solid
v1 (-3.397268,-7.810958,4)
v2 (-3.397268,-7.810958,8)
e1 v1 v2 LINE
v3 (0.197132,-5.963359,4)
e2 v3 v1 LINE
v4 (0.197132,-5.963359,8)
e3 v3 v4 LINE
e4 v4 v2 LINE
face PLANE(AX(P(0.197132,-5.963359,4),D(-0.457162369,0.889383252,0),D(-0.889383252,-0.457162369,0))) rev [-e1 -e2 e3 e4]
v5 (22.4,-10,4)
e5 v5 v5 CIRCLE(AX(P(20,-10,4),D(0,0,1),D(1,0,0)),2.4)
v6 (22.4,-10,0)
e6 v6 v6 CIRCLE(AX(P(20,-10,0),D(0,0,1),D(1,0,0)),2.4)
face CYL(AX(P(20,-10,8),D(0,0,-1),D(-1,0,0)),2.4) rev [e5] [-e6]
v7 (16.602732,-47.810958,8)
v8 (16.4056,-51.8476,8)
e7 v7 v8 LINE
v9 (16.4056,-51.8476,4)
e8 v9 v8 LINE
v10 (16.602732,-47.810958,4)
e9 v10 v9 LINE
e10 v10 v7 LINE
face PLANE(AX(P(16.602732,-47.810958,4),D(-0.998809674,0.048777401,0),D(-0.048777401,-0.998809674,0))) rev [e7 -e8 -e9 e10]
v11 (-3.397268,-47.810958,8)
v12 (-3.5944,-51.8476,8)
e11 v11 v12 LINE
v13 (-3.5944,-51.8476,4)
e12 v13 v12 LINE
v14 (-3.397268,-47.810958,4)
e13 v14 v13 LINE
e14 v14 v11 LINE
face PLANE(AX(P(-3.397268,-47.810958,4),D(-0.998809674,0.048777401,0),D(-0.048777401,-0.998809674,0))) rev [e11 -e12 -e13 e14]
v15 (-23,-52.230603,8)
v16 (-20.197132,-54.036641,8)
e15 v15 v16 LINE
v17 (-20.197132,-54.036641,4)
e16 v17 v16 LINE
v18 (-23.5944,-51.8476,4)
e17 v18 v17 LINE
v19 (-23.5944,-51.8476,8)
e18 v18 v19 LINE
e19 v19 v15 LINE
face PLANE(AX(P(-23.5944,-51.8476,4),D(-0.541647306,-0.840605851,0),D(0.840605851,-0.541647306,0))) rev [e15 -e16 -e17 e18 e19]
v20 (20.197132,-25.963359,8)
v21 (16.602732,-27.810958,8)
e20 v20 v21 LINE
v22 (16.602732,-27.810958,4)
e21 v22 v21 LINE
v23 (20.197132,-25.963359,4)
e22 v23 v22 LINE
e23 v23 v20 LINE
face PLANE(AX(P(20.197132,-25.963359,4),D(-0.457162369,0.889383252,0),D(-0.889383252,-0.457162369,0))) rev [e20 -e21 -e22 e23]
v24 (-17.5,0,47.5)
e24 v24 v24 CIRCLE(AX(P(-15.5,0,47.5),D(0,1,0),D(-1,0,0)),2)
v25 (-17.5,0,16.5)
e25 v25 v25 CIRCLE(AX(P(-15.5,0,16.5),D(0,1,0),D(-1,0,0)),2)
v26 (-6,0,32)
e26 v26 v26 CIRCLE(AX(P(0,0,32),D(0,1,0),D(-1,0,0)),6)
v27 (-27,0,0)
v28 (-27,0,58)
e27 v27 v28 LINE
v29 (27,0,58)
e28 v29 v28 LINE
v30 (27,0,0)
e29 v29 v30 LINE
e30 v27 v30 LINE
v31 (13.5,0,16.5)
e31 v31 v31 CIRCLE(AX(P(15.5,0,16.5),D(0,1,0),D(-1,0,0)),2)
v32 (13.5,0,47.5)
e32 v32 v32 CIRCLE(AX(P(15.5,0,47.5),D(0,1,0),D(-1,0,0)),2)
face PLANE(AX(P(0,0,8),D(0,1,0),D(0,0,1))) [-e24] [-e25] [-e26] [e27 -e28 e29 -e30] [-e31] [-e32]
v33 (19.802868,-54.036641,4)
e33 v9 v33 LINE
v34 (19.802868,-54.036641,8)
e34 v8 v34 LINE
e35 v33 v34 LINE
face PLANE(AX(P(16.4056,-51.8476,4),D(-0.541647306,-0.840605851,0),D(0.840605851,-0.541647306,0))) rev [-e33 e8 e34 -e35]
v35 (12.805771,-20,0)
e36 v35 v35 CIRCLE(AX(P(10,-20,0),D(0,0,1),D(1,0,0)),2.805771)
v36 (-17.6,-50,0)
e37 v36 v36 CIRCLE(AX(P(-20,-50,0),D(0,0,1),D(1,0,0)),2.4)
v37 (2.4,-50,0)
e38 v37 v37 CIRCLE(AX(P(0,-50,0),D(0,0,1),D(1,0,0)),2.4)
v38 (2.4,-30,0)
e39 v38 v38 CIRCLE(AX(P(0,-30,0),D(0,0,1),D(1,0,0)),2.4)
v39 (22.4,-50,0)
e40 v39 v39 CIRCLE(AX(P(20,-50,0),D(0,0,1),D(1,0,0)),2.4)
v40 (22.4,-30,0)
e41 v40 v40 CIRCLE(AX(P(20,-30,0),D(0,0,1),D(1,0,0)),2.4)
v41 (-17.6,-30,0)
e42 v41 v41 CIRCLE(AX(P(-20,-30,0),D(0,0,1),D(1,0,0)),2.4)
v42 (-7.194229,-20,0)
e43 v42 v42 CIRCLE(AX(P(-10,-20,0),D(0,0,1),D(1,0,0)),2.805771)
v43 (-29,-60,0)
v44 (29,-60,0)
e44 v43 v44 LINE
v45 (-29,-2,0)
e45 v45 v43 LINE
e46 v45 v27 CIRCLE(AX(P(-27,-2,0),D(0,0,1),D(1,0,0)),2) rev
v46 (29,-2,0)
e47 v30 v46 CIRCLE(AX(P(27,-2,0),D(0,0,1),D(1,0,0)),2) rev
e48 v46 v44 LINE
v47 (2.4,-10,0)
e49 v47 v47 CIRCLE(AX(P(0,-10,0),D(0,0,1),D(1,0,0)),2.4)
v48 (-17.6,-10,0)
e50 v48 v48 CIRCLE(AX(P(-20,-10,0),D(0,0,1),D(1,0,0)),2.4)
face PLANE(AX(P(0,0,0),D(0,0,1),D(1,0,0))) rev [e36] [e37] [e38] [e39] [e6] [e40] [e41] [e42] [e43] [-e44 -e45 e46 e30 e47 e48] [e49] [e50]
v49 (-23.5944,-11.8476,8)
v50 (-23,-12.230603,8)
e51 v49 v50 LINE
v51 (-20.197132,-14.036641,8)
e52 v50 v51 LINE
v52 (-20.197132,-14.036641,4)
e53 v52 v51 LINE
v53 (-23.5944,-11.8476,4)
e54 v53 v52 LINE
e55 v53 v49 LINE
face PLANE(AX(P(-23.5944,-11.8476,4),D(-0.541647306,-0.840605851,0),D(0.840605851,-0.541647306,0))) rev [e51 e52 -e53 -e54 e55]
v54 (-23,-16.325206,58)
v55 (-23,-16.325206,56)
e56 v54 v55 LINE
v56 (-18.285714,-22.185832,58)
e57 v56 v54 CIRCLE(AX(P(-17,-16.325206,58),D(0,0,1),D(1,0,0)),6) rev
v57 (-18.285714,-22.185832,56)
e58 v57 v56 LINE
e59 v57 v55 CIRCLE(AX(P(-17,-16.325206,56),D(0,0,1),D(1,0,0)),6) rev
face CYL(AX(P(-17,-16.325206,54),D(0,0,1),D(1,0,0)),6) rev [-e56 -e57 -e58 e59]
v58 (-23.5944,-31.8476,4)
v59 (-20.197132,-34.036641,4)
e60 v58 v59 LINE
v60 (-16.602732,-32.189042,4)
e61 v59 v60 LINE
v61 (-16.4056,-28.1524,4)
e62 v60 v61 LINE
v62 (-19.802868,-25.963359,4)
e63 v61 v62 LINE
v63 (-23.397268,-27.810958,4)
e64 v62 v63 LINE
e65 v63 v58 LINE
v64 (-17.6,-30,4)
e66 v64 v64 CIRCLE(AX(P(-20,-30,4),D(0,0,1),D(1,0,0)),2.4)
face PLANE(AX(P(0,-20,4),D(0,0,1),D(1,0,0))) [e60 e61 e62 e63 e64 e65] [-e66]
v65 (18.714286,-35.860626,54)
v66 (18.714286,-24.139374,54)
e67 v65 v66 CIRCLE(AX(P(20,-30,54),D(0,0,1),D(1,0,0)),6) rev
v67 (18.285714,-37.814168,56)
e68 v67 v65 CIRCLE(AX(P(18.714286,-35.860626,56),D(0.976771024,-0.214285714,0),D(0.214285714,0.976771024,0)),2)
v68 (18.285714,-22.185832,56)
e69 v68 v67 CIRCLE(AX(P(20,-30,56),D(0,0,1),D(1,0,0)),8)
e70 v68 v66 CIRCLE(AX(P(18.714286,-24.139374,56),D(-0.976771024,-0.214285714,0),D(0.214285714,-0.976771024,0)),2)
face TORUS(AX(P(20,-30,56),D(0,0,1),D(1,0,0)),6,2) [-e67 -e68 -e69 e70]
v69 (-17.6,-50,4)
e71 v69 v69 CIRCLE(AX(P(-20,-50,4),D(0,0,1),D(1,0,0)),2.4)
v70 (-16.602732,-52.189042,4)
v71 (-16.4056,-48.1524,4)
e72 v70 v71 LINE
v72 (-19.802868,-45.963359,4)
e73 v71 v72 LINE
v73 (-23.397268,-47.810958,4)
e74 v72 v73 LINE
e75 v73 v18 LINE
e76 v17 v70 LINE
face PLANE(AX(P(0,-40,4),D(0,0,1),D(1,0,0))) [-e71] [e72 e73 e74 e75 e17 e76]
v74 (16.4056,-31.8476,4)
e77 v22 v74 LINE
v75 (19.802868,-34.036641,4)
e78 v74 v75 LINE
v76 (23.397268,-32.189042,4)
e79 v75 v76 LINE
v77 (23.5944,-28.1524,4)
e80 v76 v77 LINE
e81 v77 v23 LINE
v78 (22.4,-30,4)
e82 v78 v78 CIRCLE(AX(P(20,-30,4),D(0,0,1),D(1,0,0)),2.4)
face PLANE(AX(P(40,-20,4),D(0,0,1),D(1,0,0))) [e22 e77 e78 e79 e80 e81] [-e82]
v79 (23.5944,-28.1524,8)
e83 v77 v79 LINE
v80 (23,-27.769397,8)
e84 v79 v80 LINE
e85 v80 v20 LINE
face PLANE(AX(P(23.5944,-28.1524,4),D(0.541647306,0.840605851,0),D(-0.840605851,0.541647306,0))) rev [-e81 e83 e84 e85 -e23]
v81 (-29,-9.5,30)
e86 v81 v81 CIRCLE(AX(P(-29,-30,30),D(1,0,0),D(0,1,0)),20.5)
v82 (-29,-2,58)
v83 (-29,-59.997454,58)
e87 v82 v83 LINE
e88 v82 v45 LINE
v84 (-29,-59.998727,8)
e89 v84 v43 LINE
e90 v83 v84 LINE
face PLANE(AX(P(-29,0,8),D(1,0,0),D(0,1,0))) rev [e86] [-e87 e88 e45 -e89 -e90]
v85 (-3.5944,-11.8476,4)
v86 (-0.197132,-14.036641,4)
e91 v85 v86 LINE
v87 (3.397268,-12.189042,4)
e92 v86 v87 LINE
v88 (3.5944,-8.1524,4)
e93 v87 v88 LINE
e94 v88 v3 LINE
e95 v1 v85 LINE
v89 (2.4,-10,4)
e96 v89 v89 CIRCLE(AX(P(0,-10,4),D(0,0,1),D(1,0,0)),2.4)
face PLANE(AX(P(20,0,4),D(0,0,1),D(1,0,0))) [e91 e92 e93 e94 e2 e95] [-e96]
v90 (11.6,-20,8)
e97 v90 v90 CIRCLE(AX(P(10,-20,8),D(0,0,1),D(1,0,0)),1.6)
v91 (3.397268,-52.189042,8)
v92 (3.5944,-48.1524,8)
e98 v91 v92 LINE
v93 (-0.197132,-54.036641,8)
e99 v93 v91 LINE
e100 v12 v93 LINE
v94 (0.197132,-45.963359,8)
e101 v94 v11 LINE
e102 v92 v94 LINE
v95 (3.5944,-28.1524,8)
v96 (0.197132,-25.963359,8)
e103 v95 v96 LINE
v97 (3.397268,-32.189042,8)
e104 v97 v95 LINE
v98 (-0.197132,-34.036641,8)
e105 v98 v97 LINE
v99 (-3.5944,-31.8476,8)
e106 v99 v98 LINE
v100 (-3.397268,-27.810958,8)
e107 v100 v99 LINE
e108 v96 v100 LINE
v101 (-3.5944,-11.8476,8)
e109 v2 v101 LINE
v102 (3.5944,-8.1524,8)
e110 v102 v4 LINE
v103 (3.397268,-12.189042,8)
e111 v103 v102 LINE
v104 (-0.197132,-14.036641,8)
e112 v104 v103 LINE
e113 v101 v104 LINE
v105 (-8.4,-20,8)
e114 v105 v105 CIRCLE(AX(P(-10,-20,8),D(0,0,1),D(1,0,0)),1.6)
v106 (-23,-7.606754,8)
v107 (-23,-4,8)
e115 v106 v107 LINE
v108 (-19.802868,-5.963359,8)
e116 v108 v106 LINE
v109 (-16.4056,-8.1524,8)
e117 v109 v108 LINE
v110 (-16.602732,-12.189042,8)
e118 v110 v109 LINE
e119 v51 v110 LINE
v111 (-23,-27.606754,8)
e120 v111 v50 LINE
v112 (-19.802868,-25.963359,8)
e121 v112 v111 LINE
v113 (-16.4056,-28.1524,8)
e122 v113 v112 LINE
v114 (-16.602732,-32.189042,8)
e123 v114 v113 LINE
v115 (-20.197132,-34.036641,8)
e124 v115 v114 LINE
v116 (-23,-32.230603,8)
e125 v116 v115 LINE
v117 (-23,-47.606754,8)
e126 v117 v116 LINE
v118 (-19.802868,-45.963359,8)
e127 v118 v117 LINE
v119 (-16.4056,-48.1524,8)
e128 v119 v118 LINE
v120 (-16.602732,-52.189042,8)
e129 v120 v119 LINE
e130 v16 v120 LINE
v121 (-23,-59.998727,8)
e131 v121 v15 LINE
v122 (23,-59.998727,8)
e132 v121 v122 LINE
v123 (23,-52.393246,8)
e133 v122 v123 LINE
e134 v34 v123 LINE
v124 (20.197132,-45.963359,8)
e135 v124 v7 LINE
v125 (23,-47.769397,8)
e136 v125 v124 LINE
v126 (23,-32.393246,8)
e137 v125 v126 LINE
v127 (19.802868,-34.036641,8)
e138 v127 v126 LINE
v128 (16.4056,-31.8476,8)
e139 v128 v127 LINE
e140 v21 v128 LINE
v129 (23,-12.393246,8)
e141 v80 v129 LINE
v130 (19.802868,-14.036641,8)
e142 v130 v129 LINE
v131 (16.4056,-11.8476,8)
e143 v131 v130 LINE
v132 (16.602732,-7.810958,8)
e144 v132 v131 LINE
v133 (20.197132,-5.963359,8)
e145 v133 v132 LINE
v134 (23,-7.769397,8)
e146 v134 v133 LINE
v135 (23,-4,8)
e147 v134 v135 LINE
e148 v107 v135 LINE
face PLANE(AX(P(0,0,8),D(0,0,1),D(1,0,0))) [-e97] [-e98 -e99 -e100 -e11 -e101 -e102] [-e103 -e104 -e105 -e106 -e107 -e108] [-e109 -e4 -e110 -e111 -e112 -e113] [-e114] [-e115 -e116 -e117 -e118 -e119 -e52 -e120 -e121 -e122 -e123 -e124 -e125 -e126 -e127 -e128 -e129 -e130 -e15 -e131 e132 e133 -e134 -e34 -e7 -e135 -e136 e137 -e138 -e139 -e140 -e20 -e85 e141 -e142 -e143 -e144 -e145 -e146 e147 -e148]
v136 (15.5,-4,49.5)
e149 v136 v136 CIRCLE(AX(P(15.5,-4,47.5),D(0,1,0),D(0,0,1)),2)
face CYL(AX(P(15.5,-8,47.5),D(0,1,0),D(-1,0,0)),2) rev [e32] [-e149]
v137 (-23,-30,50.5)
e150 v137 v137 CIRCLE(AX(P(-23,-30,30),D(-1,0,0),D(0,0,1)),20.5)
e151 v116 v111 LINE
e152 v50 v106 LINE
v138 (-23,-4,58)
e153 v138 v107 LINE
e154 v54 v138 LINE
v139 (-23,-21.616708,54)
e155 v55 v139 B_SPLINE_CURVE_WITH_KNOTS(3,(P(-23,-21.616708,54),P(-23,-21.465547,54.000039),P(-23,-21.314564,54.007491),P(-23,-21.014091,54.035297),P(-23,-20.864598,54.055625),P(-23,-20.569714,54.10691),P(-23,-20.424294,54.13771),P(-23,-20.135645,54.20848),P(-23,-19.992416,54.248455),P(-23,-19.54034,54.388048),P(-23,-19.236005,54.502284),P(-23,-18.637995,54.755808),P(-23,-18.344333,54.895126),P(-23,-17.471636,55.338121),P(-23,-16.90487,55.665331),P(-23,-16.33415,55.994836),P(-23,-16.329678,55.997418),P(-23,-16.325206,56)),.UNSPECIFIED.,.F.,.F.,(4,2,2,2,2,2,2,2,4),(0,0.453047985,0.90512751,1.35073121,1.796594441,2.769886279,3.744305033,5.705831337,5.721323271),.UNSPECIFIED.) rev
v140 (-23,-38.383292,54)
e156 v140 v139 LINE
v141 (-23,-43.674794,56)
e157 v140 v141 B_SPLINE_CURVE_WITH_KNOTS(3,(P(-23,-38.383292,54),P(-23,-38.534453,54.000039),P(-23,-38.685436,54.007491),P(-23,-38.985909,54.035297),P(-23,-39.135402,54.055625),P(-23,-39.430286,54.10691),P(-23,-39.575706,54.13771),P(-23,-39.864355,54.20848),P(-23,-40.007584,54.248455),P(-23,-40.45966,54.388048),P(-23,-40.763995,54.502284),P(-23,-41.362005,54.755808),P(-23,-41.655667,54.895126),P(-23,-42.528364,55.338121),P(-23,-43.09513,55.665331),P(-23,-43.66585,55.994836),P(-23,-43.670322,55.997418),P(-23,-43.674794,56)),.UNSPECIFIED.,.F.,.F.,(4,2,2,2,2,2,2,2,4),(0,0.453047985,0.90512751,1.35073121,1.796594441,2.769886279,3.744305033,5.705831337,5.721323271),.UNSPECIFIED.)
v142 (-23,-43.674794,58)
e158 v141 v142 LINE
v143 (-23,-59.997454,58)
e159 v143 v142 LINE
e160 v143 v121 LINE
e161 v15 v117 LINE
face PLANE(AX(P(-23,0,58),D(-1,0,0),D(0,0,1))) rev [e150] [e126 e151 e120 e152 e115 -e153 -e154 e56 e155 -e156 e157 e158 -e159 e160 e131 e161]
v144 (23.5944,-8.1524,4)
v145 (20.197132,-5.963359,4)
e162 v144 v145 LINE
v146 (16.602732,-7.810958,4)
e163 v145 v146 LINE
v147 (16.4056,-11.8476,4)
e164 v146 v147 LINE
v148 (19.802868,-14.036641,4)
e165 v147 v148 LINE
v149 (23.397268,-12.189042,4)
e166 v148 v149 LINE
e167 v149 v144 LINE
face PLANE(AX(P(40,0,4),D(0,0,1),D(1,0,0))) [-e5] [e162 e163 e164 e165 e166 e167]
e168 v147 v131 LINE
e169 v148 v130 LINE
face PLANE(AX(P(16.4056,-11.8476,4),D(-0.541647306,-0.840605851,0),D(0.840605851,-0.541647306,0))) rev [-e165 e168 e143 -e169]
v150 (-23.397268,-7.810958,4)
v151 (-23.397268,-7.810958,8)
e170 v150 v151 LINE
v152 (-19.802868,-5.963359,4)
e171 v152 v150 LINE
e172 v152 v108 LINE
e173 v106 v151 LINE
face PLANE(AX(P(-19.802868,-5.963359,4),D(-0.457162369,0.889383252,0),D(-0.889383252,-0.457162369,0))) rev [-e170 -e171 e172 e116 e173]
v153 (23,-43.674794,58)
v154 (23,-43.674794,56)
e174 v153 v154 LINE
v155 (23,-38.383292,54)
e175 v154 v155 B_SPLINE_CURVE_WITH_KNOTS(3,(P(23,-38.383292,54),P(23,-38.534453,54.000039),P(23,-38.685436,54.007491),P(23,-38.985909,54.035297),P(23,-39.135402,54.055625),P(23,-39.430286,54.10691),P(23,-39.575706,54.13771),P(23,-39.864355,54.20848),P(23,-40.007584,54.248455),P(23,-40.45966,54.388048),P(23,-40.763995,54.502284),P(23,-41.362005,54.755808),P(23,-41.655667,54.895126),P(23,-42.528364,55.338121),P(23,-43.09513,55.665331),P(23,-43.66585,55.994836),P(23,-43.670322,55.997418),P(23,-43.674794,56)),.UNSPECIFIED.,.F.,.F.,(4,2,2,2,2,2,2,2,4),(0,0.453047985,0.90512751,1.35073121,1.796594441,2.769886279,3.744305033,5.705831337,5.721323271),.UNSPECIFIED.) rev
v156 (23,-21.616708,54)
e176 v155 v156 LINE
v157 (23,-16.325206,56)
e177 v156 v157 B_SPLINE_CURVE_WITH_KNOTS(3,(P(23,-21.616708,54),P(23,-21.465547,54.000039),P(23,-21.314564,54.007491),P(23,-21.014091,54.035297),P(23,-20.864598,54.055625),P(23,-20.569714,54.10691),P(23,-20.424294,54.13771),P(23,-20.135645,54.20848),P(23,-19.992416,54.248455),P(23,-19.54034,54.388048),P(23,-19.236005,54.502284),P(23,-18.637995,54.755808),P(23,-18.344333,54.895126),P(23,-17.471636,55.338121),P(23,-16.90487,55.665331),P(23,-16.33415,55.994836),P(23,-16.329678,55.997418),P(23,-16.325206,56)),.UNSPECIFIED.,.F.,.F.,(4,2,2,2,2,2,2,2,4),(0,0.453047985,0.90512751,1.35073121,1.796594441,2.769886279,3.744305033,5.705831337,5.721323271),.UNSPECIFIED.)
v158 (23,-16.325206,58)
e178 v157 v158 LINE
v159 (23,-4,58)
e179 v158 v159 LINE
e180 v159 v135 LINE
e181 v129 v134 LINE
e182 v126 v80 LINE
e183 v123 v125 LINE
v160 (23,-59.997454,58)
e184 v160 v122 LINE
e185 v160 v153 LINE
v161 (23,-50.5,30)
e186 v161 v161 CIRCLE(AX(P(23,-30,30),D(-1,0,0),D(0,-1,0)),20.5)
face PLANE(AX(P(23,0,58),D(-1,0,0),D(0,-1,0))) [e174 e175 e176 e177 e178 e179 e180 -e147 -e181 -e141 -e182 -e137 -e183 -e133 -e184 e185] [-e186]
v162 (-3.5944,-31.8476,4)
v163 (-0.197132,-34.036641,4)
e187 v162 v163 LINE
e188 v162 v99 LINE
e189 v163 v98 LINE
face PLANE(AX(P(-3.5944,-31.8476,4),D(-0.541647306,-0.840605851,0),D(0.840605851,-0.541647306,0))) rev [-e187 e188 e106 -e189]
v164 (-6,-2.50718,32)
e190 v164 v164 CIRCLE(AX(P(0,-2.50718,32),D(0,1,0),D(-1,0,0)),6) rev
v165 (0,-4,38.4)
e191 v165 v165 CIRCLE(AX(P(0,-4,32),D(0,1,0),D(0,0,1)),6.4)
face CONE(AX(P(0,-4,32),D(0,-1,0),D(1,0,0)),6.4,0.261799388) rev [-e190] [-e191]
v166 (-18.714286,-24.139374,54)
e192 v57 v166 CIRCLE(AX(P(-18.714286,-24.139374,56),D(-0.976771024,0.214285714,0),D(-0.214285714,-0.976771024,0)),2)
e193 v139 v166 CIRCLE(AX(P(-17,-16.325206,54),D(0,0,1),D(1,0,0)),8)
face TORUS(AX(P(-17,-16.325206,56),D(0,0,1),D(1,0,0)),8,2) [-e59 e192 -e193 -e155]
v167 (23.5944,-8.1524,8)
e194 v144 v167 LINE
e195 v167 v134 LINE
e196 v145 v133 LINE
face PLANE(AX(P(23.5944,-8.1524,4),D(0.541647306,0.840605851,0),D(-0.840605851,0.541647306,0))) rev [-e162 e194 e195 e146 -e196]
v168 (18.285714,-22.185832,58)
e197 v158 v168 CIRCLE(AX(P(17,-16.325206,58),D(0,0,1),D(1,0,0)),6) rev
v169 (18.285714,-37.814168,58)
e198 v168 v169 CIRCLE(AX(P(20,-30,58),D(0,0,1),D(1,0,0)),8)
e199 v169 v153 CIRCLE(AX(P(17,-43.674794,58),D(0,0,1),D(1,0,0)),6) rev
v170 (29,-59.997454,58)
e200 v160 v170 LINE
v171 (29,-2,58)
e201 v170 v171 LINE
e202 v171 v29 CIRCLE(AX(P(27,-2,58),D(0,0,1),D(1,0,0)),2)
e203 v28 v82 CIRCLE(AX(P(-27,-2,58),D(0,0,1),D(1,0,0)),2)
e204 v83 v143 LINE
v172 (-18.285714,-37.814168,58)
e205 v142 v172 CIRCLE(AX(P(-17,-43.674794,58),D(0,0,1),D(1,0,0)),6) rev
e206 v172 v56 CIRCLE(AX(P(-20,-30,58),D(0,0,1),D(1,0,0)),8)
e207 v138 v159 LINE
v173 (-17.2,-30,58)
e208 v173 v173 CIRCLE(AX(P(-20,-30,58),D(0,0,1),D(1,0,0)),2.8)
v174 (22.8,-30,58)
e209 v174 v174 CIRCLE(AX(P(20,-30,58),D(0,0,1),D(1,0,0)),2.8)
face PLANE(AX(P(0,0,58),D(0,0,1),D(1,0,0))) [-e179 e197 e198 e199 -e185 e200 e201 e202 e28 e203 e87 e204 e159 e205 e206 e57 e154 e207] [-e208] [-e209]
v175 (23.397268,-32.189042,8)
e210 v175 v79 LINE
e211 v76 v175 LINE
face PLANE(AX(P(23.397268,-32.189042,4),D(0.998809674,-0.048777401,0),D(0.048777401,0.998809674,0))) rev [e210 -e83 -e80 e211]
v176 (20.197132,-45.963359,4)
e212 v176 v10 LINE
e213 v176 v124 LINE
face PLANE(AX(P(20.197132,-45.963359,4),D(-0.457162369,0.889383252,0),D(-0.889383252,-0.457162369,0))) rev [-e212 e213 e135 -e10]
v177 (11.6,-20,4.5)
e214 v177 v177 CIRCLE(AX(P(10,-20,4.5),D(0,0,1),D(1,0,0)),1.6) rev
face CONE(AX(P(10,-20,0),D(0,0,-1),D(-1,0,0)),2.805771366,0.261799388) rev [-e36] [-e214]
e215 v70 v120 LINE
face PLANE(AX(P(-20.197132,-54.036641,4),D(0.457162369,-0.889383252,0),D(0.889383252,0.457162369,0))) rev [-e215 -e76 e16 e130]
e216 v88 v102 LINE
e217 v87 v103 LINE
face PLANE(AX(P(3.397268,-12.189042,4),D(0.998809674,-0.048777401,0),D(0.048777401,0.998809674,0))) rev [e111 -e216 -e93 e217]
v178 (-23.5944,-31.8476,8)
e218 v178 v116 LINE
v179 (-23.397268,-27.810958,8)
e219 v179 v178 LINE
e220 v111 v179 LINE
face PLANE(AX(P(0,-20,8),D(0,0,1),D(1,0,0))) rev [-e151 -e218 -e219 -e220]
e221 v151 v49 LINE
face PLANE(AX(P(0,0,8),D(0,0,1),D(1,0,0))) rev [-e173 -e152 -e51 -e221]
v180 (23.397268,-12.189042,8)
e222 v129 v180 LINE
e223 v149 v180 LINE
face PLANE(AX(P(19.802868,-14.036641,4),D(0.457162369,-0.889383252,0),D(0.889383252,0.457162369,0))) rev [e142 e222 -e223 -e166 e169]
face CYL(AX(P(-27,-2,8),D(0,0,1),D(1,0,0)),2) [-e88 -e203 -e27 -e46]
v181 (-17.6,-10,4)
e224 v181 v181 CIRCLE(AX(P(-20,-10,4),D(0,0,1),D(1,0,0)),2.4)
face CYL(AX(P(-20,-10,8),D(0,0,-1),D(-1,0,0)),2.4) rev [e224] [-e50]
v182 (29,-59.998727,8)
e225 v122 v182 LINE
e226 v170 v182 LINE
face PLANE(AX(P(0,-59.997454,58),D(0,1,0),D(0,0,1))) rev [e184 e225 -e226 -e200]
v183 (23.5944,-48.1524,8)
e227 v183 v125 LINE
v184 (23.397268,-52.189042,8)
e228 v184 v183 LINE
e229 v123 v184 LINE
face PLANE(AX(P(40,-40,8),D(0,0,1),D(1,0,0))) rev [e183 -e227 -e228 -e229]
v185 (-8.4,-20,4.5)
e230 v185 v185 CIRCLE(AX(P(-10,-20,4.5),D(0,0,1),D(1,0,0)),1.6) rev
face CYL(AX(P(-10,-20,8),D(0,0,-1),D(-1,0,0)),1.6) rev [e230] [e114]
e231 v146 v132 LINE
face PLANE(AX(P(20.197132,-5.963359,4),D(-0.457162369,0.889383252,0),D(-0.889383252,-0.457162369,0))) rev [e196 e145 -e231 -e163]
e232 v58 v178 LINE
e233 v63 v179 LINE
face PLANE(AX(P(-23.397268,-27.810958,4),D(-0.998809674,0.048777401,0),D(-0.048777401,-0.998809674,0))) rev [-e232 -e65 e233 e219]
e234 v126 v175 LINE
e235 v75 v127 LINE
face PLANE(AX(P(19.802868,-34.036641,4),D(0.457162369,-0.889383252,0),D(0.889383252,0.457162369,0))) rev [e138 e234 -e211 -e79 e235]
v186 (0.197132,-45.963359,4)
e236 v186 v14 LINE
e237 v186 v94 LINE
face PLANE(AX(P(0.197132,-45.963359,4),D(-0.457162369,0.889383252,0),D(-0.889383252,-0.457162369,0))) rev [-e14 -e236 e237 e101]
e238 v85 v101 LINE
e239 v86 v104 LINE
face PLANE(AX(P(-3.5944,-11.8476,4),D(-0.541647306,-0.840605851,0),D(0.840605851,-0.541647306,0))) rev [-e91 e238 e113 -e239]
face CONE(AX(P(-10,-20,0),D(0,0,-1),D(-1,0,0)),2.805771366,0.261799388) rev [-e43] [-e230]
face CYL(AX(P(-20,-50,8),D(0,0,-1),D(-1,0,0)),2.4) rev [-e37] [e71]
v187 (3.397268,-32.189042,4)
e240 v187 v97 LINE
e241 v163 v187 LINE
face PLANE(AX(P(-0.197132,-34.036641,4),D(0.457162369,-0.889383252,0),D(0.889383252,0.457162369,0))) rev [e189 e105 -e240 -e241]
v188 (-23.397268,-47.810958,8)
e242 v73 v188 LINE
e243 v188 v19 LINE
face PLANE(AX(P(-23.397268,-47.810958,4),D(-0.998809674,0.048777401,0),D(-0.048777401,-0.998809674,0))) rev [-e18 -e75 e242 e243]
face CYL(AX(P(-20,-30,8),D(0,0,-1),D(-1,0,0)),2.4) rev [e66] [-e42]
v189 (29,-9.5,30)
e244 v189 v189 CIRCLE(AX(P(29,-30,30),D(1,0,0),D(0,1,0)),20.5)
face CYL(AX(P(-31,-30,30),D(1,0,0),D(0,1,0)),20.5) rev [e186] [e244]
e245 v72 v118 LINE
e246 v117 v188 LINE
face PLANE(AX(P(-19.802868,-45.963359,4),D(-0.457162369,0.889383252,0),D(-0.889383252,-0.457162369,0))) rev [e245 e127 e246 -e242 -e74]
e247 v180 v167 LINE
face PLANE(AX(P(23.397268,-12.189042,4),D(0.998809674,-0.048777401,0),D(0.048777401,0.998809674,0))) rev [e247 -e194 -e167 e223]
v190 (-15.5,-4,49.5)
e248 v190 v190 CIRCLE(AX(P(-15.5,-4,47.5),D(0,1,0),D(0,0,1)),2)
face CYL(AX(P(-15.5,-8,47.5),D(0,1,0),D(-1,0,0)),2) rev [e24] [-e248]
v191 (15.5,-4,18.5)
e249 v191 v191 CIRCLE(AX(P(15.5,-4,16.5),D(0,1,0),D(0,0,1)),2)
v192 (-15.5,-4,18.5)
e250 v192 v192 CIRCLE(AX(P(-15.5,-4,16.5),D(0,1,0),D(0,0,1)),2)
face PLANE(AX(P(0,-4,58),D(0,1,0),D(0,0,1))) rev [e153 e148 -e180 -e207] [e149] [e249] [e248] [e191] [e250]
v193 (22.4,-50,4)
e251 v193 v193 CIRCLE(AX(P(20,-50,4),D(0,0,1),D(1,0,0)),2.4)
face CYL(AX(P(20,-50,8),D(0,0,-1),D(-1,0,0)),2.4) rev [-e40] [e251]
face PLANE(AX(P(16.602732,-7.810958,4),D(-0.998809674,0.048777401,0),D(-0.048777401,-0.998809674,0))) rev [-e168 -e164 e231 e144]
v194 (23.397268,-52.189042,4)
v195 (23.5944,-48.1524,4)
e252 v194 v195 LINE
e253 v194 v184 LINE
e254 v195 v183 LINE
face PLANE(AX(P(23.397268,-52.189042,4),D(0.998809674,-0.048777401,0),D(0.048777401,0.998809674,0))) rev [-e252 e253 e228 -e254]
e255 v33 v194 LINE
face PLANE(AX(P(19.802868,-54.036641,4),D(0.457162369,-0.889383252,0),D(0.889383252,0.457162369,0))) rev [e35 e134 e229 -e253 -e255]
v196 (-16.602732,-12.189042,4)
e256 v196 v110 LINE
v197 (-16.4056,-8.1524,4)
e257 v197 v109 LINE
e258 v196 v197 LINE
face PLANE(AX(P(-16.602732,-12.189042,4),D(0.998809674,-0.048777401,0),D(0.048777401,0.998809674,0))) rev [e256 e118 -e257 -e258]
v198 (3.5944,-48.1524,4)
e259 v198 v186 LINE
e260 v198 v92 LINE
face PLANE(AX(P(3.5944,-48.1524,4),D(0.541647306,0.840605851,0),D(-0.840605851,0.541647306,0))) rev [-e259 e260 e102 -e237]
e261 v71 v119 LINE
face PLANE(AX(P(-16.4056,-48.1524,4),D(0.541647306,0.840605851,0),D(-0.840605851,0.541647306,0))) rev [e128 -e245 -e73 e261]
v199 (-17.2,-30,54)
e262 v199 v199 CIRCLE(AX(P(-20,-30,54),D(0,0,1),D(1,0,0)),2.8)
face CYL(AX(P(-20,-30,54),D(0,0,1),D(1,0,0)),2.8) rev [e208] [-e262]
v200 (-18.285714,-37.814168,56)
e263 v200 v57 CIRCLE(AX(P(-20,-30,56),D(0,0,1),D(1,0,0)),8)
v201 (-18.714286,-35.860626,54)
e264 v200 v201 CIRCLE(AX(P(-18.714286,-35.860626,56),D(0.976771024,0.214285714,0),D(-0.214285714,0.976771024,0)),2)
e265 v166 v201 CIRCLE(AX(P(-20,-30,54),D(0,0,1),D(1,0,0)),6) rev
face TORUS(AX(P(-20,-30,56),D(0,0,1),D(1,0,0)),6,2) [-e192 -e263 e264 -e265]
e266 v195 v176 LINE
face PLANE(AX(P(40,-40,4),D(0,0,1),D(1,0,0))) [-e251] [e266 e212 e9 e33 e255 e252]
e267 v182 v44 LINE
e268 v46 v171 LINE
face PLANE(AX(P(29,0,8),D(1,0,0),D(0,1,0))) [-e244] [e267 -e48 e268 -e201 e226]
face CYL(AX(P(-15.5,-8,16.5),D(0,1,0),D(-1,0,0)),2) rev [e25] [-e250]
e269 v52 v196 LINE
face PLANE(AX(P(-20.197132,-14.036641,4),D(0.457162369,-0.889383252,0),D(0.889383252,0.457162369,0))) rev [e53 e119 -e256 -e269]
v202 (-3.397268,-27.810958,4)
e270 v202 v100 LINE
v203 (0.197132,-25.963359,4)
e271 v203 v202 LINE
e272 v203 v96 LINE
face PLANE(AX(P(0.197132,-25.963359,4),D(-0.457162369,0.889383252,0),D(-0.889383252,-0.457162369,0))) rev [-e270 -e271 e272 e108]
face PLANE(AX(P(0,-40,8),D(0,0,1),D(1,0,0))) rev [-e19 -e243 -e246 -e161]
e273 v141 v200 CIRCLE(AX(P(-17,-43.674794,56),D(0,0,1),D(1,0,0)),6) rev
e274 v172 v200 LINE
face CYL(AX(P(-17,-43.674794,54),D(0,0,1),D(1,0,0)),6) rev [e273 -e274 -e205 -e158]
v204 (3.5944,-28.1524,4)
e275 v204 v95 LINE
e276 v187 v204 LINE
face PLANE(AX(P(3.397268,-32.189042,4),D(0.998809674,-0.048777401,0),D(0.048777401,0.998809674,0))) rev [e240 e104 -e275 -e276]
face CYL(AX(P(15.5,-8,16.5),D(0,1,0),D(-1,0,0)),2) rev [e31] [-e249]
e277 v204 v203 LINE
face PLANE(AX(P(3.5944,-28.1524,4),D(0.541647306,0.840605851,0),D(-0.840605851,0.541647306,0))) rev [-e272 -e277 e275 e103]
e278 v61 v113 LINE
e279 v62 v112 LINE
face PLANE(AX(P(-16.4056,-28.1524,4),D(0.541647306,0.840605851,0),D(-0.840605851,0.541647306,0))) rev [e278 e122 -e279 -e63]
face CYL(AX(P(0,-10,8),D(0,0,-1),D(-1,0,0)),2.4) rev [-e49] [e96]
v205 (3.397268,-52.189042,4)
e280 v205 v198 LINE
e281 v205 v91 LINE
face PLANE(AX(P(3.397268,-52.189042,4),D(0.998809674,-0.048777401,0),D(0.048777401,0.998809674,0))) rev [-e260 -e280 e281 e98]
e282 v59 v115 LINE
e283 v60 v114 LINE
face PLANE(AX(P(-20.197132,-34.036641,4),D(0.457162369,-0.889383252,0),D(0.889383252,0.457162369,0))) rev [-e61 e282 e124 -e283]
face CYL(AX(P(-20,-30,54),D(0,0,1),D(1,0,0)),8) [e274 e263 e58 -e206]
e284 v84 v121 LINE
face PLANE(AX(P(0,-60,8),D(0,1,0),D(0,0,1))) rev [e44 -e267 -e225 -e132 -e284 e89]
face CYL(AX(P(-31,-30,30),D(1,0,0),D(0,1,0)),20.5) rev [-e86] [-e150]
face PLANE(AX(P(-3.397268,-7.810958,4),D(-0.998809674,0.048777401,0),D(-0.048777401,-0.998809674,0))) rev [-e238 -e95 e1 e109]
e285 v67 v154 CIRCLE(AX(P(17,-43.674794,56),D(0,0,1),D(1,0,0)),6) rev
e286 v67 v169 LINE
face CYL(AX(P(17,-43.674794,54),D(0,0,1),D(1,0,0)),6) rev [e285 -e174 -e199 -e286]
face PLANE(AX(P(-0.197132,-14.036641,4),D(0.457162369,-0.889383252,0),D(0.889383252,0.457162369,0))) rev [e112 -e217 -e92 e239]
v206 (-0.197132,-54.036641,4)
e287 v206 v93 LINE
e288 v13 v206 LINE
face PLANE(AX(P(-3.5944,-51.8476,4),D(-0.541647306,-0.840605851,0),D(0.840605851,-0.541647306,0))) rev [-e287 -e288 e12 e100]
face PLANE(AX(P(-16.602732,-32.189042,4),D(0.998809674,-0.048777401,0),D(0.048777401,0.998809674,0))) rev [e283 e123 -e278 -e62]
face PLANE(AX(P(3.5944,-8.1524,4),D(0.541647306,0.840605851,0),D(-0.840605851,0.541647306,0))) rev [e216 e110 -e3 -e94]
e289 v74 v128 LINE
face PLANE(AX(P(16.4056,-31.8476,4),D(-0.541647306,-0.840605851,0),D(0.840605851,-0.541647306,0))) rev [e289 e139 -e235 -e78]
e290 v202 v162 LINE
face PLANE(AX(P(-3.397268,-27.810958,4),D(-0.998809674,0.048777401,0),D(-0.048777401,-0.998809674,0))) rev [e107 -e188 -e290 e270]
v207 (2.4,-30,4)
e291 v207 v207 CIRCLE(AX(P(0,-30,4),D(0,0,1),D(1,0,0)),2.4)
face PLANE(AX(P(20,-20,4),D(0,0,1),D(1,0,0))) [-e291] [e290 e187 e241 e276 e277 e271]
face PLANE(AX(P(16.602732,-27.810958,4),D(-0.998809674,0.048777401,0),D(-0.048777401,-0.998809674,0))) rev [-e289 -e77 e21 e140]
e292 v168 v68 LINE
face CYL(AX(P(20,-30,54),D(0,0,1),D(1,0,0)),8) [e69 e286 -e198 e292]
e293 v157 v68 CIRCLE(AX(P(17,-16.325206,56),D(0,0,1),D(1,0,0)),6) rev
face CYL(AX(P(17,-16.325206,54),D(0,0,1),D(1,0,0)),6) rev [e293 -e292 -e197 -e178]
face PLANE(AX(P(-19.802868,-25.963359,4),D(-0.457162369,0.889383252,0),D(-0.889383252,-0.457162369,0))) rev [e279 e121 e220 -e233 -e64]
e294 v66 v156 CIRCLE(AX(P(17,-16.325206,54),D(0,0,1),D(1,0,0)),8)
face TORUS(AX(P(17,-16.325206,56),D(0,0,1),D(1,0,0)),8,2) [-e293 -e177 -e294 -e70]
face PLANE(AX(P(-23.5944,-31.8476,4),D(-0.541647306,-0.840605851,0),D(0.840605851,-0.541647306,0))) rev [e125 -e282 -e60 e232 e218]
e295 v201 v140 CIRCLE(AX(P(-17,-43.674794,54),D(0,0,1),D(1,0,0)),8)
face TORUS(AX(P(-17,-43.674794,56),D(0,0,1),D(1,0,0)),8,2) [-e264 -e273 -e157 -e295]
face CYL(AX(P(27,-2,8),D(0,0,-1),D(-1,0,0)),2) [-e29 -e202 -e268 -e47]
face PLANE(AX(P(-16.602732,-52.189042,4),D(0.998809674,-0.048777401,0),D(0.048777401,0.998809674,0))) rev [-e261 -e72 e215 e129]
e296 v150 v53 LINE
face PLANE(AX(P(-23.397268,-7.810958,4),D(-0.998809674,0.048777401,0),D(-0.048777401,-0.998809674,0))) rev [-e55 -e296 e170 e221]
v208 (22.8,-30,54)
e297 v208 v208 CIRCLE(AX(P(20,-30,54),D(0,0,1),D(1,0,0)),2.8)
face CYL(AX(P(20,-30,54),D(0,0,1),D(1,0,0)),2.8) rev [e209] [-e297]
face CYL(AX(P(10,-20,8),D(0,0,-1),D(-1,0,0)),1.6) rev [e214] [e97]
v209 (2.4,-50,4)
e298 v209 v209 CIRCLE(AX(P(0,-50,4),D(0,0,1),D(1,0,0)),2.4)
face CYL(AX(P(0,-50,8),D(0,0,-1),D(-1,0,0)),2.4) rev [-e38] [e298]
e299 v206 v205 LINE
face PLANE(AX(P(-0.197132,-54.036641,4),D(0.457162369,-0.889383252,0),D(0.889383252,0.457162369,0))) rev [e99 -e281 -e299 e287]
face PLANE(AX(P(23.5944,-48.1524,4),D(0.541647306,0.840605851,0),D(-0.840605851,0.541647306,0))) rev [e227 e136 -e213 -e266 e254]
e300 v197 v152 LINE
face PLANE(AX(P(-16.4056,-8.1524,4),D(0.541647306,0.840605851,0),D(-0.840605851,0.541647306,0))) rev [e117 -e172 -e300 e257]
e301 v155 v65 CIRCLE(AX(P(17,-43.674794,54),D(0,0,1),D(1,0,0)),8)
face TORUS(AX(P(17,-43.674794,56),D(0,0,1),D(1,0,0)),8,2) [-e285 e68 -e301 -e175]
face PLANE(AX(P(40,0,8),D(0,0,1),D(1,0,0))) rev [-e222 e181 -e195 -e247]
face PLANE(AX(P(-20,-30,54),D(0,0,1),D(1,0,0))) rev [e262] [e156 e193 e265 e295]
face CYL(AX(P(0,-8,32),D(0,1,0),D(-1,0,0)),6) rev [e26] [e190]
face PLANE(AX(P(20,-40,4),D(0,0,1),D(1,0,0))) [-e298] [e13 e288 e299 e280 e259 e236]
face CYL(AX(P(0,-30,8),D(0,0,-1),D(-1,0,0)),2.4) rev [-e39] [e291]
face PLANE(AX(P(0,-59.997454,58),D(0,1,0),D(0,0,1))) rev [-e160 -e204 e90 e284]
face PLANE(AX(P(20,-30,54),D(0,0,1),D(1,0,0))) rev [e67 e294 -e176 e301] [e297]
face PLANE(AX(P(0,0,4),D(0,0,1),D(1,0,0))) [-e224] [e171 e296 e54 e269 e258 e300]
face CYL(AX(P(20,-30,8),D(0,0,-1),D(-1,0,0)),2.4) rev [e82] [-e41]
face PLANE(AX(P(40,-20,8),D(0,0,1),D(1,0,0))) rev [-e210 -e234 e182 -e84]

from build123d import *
from OCP.BRepFilletAPI import BRepFilletAPI_MakeChamfer

# Parameters (mm, degrees)
SKIZZE1_W                       = 58
SKIZZE1_H                       = 60
SKIZZE1_R                       = 2.4
SKIZZE1_R_2                     = 1.6
AUFSATZ_LINEAR_AUSTRAGEN1_DEPTH = 8
AUFSATZ_LINEAR_AUSTRAGEN2_DEPTH = 50
SKIZZE5_R                       = 6
SKIZZE5_R_2                     = 2
SCHNITT_LINEAR_AUSTRAGEN1_DEPTH = 8
SKIZZE10_R                      = 8
SKIZZE10_R_2                    = 2.8
AUFSATZ_LINEAR_AUSTRAGEN3_DEPTH = 4
VERRUNDUNG1_R                   = 6
VERRUNDUNG3_R                   = 2
SKIZZE11_R                      = 2.8
SCHNITT_LINEAR_AUSTRAGEN7_DEPTH = 4
FASE3_SIZE                      = 0.4
FASE3_SIZE2                     = 1.492820323
VERRUNDUNG4_R                   = 2
FASE4_SIZE                      = 4.5
FASE4_SIZE2                     = 1.205771366
SCHNITT_LINEAR_AUSTRAGEN8_DEPTH = 4
LINEARES_MUSTER1_COUNT          = 3
LINEARES_MUSTER1_PITCH          = 20
LINEARES_MUSTER1_COUNT_DIR2     = 3
LINEARES_MUSTER1_PITCH_DIR2     = 20
SKIZZE13_R                      = 20.5
SCHNITT_LINEAR_AUSTRAGEN9_DEPTH = 60


with BuildPart() as part:
    # Skizze1 → Aufsatz-Linear austragen1 (new body)
    with BuildSketch(Plane.XY):
        with Locations((0, -30)):
            Rectangle(SKIZZE1_W, SKIZZE1_H)
        with Locations((-20, -10)):
            Circle(SKIZZE1_R, mode=Mode.SUBTRACT)
        with Locations((0, -10)):
            Circle(SKIZZE1_R, mode=Mode.SUBTRACT)
        with Locations((20, -10)):
            Circle(SKIZZE1_R, mode=Mode.SUBTRACT)
        with Locations((0, -30)):
            Circle(SKIZZE1_R, mode=Mode.SUBTRACT)
        with Locations((20, -30)):
            Circle(SKIZZE1_R, mode=Mode.SUBTRACT)
        with Locations((0, -50)):
            Circle(SKIZZE1_R, mode=Mode.SUBTRACT)
        with Locations((20, -50)):
            Circle(SKIZZE1_R, mode=Mode.SUBTRACT)
        with Locations((-20, -30)):
            Circle(SKIZZE1_R, mode=Mode.SUBTRACT)
        with Locations((-20, -50)):
            Circle(SKIZZE1_R, mode=Mode.SUBTRACT)
        with Locations((-10, -20)):
            Circle(SKIZZE1_R_2, mode=Mode.SUBTRACT)
        with Locations((10, -20)):
            Circle(SKIZZE1_R_2, mode=Mode.SUBTRACT)
    extrude(amount=AUFSATZ_LINEAR_AUSTRAGEN1_DEPTH)

    # Skizze4 → Aufsatz-Linear austragen2 (add)
    with BuildSketch(Plane.XY.offset(8)):
        Polygon((29, 0), (-29, 0), (-29, -59.997453527), (-23, -59.997453527), (-23, -4), (23, -4), (23, -59.997453527), (29, -59.997453527), align=None)
    extrude(amount=AUFSATZ_LINEAR_AUSTRAGEN2_DEPTH)

    # Skizze5 → Schnitt-Linear austragen1 (cut)
    with BuildSketch(Plane(origin=(0, 0, 0), x_dir=(1, 0, 0), z_dir=(0, 1, 0))):
        with Locations(Location((0, -32, 0), (0, 0, 180))):
            Circle(SKIZZE5_R)
        with Locations(Location((-15.5, -16.5, 0), (0, 0, 180))):
            Circle(SKIZZE5_R_2)
        with Locations(Location((15.5, -16.5, 0), (0, 0, 180))):
            Circle(SKIZZE5_R_2)
        with Locations(Location((15.5, -47.5, 0), (0, 0, 180))):
            Circle(SKIZZE5_R_2)
        with Locations(Location((-15.5, -47.5, 0), (0, 0, 180))):
            Circle(SKIZZE5_R_2)
    extrude(amount=-SCHNITT_LINEAR_AUSTRAGEN1_DEPTH, mode=Mode.SUBTRACT)

    # Skizze10 → Aufsatz-Linear austragen3 (add)
    # profile 1 of 2: a face of its own
    with BuildSketch(Plane.XY.offset(58)):
        with Locations((20, -30)):
            Circle(SKIZZE10_R)
    # profile 2 of 2: a face of its own
    with BuildSketch(Plane.XY.offset(58)):
        with Locations((-20, -30)):
            Circle(SKIZZE10_R)
        with Locations((-20, -30)):
            Circle(SKIZZE10_R_2, mode=Mode.SUBTRACT)
    extrude(amount=-AUFSATZ_LINEAR_AUSTRAGEN3_DEPTH)

    # Verrundung1
    verrundung1_edges = [part.edges().sort_by_distance(p)[0] for p in [
        (23, -37.416198487, 56),
        (23, -22.583801513, 56),
        (-23, -37.416198487, 56),
        (-23, -22.583801513, 56),
    ]]
    fillet(verrundung1_edges, radius=VERRUNDUNG1_R)

    # Verrundung3
    # the kernel refuses this fillet: 2 mm, written as the material it takes off along each edge
    with BuildSketch(Plane(origin=(-20, -30, 54), x_dir=(0.21428571428571433, -0.9767710236555245, 0), z_dir=(-0.9767710236555245, -0.21428571428571433, 0))) as verrundung3_piece_1:
        with BuildLine():
            CenterArc((8 - VERRUNDUNG3_R, VERRUNDUNG3_R), VERRUNDUNG3_R, 270, 90)
            Line((8 - VERRUNDUNG3_R, 0), (8, 0))
            Line((8, 0), (8, VERRUNDUNG3_R))
        make_face()
    revolve(axis=Axis((-20, -30, 54), (0, 0, 1)), revolution_arc=155.252749768, mode=Mode.SUBTRACT)
    with BuildSketch(Plane(origin=(20, -30, 54), x_dir=(-0.21428571428571347, 0.9767710236555247, 0), z_dir=(0.9767710236555247, 0.21428571428571347, 0))) as verrundung3_piece_2:
        with BuildLine():
            CenterArc((8 - VERRUNDUNG3_R, VERRUNDUNG3_R), VERRUNDUNG3_R, 270, 90)
            Line((8 - VERRUNDUNG3_R, 0), (8, 0))
            Line((8, 0), (8, VERRUNDUNG3_R))
        make_face()
    revolve(axis=Axis((20, -30, 54), (0, 0, 1)), revolution_arc=155.252749768, mode=Mode.SUBTRACT)
    with BuildSketch(Plane(origin=(-17, -16.325205669, 54), x_dir=(-0.6722279054593165, 0.7403442733767718, 0), z_dir=(0.7403442733767718, 0.6722279054593165, 0))) as verrundung3_piece_3_section:
        with BuildLine():
            CenterArc((6 + VERRUNDUNG3_R, VERRUNDUNG3_R), VERRUNDUNG3_R, 180, 90)
            Line((6 + VERRUNDUNG3_R, 0), (6, 0))
            Line((6, 0), (6, VERRUNDUNG3_R))
        make_face()
    verrundung3_piece_3 = revolve(axis=Axis((-17, -16.325205669, 54), (0, 0, 1)), revolution_arc=125.387125524, mode=Mode.PRIVATE)
    verrundung3_piece_3 = split(verrundung3_piece_3, bisect_by=Plane(origin=(-23, -20.355034942, 54.516064296), z_dir=(1, 0, 0)), keep=Keep.TOP, mode=Mode.PRIVATE)
    add(verrundung3_piece_3, mode=Mode.SUBTRACT)
    with BuildSketch(Plane(origin=(-17, -43.674794331, 54), x_dir=(-0.6722279054593165, -0.7403442733767718, 0), z_dir=(0.7403442733767718, -0.6722279054593165, 0))) as verrundung3_piece_4_section:
        with BuildLine():
            CenterArc((6 + VERRUNDUNG3_R, -VERRUNDUNG3_R), VERRUNDUNG3_R, 90, 90)
            Line((6, -VERRUNDUNG3_R), (6, 0))
            Line((6, 0), (6 + VERRUNDUNG3_R, 0))
        make_face()
    verrundung3_piece_4 = revolve(axis=Axis((-17, -43.674794331, 54), (0, 0, -1)), revolution_arc=125.387125524, mode=Mode.PRIVATE)
    verrundung3_piece_4 = split(verrundung3_piece_4, bisect_by=Plane(origin=(-23, -39.644965239, 54.51606418), z_dir=(1, 0, 0)), keep=Keep.TOP, mode=Mode.PRIVATE)
    add(verrundung3_piece_4, mode=Mode.SUBTRACT)
    with BuildSketch(Plane(origin=(17, -43.674794331, 54), x_dir=(0.6722279054593165, -0.7403442733767718, 0), z_dir=(-0.7403442733767718, -0.6722279054593165, 0))) as verrundung3_piece_5_section:
        with BuildLine():
            CenterArc((6 + VERRUNDUNG3_R, VERRUNDUNG3_R), VERRUNDUNG3_R, 180, 90)
            Line((6 + VERRUNDUNG3_R, 0), (6, 0))
            Line((6, 0), (6, VERRUNDUNG3_R))
        make_face()
    verrundung3_piece_5 = revolve(axis=Axis((17, -43.674794331, 54), (0, 0, 1)), revolution_arc=125.387125524, mode=Mode.PRIVATE)
    verrundung3_piece_5 = split(verrundung3_piece_5, bisect_by=Plane(origin=(23, -39.644965059, 54.516064297), z_dir=(-1, 0, 0)), keep=Keep.TOP, mode=Mode.PRIVATE)
    add(verrundung3_piece_5, mode=Mode.SUBTRACT)
    with BuildSketch(Plane(origin=(17, -16.325205669, 54), x_dir=(0.6722279054593165, 0.7403442733767718, 0), z_dir=(-0.7403442733767718, 0.6722279054593165, 0))) as verrundung3_piece_6_section:
        with BuildLine():
            CenterArc((6 + VERRUNDUNG3_R, -VERRUNDUNG3_R), VERRUNDUNG3_R, 90, 90)
            Line((6, -VERRUNDUNG3_R), (6, 0))
            Line((6, 0), (6 + VERRUNDUNG3_R, 0))
        make_face()
    verrundung3_piece_6 = revolve(axis=Axis((17, -16.325205669, 54), (0, 0, -1)), revolution_arc=125.387125524, mode=Mode.PRIVATE)
    verrundung3_piece_6 = split(verrundung3_piece_6, bisect_by=Plane(origin=(23, -20.355037545, 54.516064214), z_dir=(-1, 0, 0)), keep=Keep.TOP, mode=Mode.PRIVATE)
    add(verrundung3_piece_6, mode=Mode.SUBTRACT)

    # Skizze11 → Schnitt-Linear austragen7 (cut)
    with BuildSketch(Plane.XY.offset(58)):
        with Locations((20, -30)):
            Circle(SKIZZE11_R)
    extrude(amount=-SCHNITT_LINEAR_AUSTRAGEN7_DEPTH, mode=Mode.SUBTRACT)

    # Fase3
    fase3_edges = [part.edges().sort_by_distance(p)[0] for p in [
        (6, -4, 32),
    ]]
    fase3_side = [part.faces().sort_by_distance(p)[0] for p in [
        (-22.32058849, -4, 33),
    ]]
    chamfer(fase3_edges, length=FASE3_SIZE, length2=FASE3_SIZE2, reference=fase3_side[0])

    # Verrundung4
    verrundung4_edges = [part.edges().sort_by_distance(p)[0] for p in [
        (-29, 0, 29),
        (29, 0, 29),
    ]]
    fillet(verrundung4_edges, radius=VERRUNDUNG4_R)

    # Fase4: one chamfer whose edges measure the first distance from different faces: ONE call of the kernel's chamfer builder (chamfer() names one face for all edges)
    fase4_edges_1 = [part.edges().sort_by_distance(p)[0] for p in [
        (-11.6, -20, 0),
    ]]
    fase4_side_1 = [part.faces().sort_by_distance(p)[0] for p in [
        (-11.6, -20, 4),
    ]]
    fase4_edges_2 = [part.edges().sort_by_distance(p)[0] for p in [
        (8.4, -20, 0),
    ]]
    fase4_side_2 = [part.faces().sort_by_distance(p)[0] for p in [
        (8.4, -20, 4),
    ]]
    fase4 = BRepFilletAPI_MakeChamfer(part.part.solid().wrapped)
    for e in fase4_edges_1:
        fase4.Add(FASE4_SIZE, FASE4_SIZE2, e.wrapped, fase4_side_1[0].wrapped)  # the first distance lies on this face
    for e in fase4_edges_2:
        fase4.Add(FASE4_SIZE, FASE4_SIZE2, e.wrapped, fase4_side_2[0].wrapped)  # the first distance lies on this face
    add(Compound.cast(fase4.Shape()), mode=Mode.REPLACE)

    # Skizze12 → Schnitt-Linear austragen8 (cut)
    with BuildSketch(Plane.XY.offset(8)):
        Polygon((-16.6027319, -12.189041523), (-16.405600381, -8.152400284), (-19.802868481, -5.96335876), (-23.3972681, -7.810958477), (-23.594399619, -11.847599716), (-20.197131519, -14.03664124), align=None)
    schnitt_linear_austragen8 = extrude(amount=-SCHNITT_LINEAR_AUSTRAGEN8_DEPTH, mode=Mode.SUBTRACT)

    # Lineares Muster1: Schnitt-Linear austragen8 3 × 3
    with Locations(*[(i * LINEARES_MUSTER1_PITCH, -j * LINEARES_MUSTER1_PITCH_DIR2, 0) for i in range(LINEARES_MUSTER1_COUNT) for j in range(LINEARES_MUSTER1_COUNT_DIR2) if (i, j) != (0, 0)]):
        add(schnitt_linear_austragen8, mode=Mode.SUBTRACT)

    # Skizze13 → Schnitt-Linear austragen9 (cut)
    with BuildSketch(Plane(origin=(29, 0, 0), x_dir=(0, 0, -1), z_dir=(1, 0, 0))):
        with Locations(Location((-30, -30, 0), (0, 0, 90))):
            Circle(SKIZZE13_R)
    extrude(amount=-SCHNITT_LINEAR_AUSTRAGEN9_DEPTH, mode=Mode.SUBTRACT)


solid = part.part
